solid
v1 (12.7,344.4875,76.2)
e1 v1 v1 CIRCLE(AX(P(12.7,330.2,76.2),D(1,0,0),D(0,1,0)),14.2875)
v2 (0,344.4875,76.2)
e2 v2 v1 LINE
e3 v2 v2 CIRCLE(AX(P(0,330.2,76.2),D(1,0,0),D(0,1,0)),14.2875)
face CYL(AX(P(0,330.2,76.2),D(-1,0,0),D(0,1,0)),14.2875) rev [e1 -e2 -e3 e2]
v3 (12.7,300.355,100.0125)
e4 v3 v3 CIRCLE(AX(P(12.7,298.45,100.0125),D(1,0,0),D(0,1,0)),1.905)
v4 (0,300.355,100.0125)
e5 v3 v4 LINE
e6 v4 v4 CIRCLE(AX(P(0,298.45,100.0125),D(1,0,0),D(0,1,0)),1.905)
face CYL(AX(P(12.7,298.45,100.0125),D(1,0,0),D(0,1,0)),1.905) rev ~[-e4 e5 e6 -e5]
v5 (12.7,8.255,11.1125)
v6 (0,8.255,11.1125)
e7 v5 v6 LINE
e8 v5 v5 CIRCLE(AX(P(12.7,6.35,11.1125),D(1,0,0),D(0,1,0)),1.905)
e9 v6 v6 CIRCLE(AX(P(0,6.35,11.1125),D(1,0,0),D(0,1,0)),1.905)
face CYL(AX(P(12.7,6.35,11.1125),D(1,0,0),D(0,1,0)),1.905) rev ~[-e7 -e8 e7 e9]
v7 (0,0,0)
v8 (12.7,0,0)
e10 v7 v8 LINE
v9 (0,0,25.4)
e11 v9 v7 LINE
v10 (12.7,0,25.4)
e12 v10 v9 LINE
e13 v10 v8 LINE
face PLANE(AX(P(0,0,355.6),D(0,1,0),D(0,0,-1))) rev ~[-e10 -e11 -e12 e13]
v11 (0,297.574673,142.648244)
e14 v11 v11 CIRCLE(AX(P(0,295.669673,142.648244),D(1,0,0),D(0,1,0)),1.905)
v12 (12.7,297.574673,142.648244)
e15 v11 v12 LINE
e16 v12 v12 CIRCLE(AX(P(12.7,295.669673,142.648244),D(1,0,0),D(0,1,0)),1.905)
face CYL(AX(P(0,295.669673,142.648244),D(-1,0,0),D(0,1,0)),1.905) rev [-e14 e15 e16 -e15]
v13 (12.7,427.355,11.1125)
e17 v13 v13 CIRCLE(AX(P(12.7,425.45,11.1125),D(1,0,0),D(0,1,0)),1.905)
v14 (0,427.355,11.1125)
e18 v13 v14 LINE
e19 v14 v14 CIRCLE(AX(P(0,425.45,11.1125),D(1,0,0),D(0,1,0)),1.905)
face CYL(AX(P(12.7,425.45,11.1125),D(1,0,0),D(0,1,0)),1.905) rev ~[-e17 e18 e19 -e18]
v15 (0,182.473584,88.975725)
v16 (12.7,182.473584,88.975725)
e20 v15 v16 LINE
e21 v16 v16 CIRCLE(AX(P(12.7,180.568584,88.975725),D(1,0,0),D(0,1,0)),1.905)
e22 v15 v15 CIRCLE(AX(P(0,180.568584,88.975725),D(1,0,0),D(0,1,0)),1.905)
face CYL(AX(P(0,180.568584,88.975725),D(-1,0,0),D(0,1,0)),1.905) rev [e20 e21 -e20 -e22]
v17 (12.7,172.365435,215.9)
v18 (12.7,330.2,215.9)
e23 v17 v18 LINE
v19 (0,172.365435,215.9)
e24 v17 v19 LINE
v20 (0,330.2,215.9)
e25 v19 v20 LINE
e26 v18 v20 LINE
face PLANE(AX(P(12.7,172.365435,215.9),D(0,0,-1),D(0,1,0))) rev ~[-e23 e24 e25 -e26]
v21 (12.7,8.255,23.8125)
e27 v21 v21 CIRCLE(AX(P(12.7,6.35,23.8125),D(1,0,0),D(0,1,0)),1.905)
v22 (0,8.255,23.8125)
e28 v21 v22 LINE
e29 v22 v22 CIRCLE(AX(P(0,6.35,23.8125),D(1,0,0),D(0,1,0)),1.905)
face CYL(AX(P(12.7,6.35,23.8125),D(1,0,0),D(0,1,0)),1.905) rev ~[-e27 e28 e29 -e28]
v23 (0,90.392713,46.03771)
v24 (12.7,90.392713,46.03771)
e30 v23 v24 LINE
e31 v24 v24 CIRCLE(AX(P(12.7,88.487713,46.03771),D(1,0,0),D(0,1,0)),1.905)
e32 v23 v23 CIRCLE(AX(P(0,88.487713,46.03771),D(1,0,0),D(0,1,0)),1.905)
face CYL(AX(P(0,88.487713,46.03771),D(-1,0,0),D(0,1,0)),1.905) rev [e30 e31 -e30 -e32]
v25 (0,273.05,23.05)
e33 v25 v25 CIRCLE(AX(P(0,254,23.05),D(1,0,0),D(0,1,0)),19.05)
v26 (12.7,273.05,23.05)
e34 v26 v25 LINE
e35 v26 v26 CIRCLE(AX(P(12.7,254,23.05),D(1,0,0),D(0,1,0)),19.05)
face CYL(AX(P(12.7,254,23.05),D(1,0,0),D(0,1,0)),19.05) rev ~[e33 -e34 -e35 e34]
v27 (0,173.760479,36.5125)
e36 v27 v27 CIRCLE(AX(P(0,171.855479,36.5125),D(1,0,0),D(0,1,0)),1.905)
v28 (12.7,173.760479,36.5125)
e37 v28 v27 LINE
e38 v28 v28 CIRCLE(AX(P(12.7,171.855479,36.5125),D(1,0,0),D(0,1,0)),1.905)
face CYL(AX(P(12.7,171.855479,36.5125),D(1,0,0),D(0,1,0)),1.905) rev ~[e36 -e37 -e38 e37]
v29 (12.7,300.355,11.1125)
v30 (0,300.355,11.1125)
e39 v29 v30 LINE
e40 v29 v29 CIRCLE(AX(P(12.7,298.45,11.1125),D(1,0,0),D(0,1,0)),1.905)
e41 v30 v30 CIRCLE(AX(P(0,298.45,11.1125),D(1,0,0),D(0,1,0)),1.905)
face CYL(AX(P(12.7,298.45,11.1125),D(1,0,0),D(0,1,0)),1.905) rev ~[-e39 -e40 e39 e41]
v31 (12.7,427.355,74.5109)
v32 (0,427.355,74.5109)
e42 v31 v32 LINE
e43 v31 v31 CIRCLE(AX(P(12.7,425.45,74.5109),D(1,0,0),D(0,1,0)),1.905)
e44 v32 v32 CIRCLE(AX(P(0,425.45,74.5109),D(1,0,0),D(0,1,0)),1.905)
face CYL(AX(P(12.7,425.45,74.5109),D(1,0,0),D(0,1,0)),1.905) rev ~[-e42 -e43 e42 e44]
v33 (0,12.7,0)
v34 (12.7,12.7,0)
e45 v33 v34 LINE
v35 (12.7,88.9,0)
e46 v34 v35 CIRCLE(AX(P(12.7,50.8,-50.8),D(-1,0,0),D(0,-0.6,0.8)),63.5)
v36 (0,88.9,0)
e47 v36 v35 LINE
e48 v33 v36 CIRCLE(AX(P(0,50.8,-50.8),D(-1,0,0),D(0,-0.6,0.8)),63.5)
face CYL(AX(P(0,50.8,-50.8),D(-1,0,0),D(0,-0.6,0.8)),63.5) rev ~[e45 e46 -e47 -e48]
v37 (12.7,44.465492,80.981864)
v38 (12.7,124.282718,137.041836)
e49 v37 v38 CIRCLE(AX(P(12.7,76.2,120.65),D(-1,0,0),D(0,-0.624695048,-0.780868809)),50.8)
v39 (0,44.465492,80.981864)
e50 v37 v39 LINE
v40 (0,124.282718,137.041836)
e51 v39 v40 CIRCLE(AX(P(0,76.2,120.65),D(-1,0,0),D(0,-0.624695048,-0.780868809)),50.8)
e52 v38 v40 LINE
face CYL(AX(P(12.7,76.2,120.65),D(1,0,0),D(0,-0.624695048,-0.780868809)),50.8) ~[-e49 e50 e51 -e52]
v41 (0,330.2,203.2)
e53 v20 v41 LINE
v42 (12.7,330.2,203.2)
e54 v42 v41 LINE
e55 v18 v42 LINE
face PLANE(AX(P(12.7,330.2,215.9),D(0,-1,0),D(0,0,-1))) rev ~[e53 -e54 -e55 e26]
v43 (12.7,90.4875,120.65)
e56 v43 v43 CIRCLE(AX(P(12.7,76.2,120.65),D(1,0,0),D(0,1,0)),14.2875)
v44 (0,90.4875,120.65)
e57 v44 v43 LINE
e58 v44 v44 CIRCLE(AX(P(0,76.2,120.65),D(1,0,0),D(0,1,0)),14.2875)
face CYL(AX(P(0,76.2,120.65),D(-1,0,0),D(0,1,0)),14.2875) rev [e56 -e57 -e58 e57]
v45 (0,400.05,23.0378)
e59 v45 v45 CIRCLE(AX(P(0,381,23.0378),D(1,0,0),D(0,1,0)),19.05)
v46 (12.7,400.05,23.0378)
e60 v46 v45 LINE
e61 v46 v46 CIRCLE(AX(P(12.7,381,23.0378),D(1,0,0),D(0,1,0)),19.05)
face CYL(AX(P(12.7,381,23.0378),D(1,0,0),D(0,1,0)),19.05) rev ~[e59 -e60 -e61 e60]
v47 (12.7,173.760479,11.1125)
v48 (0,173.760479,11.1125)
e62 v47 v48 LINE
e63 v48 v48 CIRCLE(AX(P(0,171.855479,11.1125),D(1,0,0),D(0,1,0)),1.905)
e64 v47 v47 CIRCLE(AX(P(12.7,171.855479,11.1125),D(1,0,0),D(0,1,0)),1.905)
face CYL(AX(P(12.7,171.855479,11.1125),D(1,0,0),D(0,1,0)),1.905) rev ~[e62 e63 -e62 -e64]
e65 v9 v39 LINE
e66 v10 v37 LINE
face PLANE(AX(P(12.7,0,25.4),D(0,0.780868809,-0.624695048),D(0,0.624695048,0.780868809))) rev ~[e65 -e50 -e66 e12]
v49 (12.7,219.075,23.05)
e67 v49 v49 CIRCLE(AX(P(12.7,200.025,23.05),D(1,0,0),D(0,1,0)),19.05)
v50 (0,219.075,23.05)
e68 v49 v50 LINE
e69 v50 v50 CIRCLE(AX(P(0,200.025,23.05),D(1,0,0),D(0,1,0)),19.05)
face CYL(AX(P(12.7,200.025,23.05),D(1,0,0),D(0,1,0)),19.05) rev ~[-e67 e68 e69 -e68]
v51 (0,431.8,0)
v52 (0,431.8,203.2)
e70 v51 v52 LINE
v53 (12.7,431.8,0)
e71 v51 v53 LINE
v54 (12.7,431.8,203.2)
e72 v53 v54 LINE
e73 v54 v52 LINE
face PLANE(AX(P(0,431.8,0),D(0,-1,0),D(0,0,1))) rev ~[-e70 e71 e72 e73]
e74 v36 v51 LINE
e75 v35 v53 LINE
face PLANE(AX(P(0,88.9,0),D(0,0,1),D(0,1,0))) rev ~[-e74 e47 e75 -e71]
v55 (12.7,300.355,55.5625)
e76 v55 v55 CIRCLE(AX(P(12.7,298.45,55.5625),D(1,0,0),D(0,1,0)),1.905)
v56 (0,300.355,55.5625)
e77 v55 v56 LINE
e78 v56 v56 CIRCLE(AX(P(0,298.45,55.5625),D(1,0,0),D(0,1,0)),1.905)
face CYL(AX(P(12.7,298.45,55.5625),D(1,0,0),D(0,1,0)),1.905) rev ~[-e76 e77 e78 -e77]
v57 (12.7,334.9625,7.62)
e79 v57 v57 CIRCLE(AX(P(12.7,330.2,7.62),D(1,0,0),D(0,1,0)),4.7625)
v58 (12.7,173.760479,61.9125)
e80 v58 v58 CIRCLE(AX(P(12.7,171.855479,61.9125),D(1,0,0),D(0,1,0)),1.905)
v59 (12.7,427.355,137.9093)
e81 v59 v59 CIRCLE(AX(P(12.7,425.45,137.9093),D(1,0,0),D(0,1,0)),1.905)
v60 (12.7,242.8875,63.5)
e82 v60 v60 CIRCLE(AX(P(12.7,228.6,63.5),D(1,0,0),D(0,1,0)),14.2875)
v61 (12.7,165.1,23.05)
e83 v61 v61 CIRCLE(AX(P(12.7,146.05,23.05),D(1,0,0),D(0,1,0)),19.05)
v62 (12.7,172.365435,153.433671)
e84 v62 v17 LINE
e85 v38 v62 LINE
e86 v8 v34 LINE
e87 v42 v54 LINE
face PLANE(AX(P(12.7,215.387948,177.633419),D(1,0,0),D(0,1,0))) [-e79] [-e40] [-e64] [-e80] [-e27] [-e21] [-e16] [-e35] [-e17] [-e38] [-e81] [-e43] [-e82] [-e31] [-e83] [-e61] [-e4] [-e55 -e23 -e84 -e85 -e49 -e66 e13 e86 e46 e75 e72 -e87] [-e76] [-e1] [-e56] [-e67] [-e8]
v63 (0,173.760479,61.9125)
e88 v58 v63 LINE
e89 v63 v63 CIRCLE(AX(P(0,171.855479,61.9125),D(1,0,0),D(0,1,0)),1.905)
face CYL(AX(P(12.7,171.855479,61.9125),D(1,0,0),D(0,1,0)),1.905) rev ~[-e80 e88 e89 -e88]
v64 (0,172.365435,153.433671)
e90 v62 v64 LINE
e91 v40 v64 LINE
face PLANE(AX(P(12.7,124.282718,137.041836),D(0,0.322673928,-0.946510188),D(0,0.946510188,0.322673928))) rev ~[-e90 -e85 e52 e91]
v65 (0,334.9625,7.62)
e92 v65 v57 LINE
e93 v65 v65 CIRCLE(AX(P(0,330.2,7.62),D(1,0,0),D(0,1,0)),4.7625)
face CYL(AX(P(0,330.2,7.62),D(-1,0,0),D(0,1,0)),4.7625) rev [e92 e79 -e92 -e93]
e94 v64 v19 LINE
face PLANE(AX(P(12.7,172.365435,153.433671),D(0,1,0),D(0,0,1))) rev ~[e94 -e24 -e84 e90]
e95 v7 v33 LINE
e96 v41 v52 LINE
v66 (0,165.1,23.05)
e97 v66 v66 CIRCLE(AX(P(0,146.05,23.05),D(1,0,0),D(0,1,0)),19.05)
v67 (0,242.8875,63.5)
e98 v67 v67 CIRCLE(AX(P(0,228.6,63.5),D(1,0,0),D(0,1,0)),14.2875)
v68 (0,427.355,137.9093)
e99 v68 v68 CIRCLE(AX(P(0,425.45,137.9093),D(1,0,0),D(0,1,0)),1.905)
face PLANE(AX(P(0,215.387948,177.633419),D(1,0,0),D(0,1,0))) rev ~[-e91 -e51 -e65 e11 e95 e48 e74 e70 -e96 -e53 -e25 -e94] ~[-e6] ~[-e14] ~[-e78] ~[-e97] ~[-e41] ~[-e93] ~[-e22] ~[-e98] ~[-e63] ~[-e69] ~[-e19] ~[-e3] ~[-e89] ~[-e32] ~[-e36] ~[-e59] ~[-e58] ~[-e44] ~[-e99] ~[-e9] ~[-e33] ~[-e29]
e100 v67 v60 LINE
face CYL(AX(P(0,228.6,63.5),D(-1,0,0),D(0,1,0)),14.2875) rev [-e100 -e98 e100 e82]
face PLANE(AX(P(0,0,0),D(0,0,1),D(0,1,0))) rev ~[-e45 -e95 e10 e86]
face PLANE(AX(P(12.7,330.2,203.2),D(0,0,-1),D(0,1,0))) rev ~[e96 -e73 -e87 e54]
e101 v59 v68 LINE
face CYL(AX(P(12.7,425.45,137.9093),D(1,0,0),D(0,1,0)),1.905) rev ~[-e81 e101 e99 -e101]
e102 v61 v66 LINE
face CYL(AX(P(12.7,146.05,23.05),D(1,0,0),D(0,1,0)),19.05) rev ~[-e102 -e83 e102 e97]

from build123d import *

# Parameters (mm, degrees)
F0_R     = 1.905
F0_R_2   = 14.2875
F0_R_3   = 4.7625
F1_DEPTH = 12.7
F2_R     = 19.05
F3_DEPTH = 12.7
F5_DEPTH = 12.7
F6_R     = 1.905
F7_DEPTH = 12.7


with BuildPart() as f1:
    # F0 (on Right) → F1 (new body)
    with BuildSketch(Plane.YZ):
        with BuildLine():
            Line((0, 355.6), (0, 0))
            Line((0, 0), (12.7, 0))
            ThreePointArc((12.7, 0), (50.8, 12.7), (88.9, 0))
            Line((88.9, 0), (431.8, 0))
            Line((431.8, 0), (431.8, 355.6))
            Line((431.8, 355.6), (0, 355.6))
        make_face()
        with Locations((88.4877131973, 46.0377095938)):
            Circle(F0_R, mode=Mode.SUBTRACT)
        with Locations((180.5685843602, 88.9757249866)):
            Circle(F0_R, mode=Mode.SUBTRACT)
        with Locations((228.6, 63.5)):
            Circle(F0_R_2, mode=Mode.SUBTRACT)
        with Locations((330.2, 7.62)):
            Circle(F0_R_3, mode=Mode.SUBTRACT)
        with Locations((330.2, 76.2)):
            Circle(F0_R_2, mode=Mode.SUBTRACT)
        with Locations((76.2, 120.65)):
            Circle(F0_R_2, mode=Mode.SUBTRACT)
        with Locations((295.6696733139, 142.6482442277)):
            Circle(F0_R, mode=Mode.SUBTRACT)
    extrude(amount=F1_DEPTH)

    # F2 (on face) → F3 (cut, through all)
    with BuildSketch(Plane.YZ.offset(12.7)):
        with Locations((146.05, 23.05)):
            Circle(F2_R)
        with Locations((254, 23.05)):
            Circle(F2_R)
        with Locations((381, 23.0378)):
            Circle(F2_R)
        with Locations((200.025, 23.05)):
            Circle(F2_R)
    extrude(amount=-F3_DEPTH, mode=Mode.SUBTRACT)

    # F4 (on face) → F5 (cut, through all)
    with BuildSketch(Plane.YZ.offset(12.7)):
        Polygon((431.8, 355.6), (0, 355.6), (0, 215.9), (172.3654351189, 215.9), (330.2, 215.9), (355.6, 215.9), (431.8, 215.9), align=None)
        with BuildLine():
            Line((172.3654351189, 215.9), (0, 215.9))
            Line((0, 215.9), (0, 25.4))
            Line((0, 25.4), (44.4654915842, 80.9818644803))
            ThreePointArc((44.4654915842, 80.9818644803), (47.0024645882, 162.2209505049), (124.2827175595, 137.0418355316))
            Line((124.2827175595, 137.0418355316), (172.3654351189, 153.4336710633))
            Line((172.3654351189, 153.4336710633), (172.3654351189, 215.9))
        make_face()
        Polygon((431.8, 203.2), (431.8, 215.9), (355.6, 215.9), (330.2, 207.2409090909), (330.2, 203.2), align=None)
        Polygon((330.2, 207.2409090909), (355.6, 215.9), (330.2, 215.9), align=None)
    extrude(amount=-F5_DEPTH, mode=Mode.SUBTRACT)

    # F6 (on face) → F7 (cut, through all)
    with BuildSketch(Plane.YZ.offset(12.7)):
        with Locations((425.45, 11.1125)):
            Circle(F6_R)
        with Locations((425.45, 74.5109)):
            Circle(F6_R)
        with Locations((425.45, 137.9093)):
            Circle(F6_R)
        with Locations((298.45, 11.1125)):
            Circle(F6_R)
        with Locations((298.45, 100.0125)):
            Circle(F6_R)
        with Locations((298.45, 55.5625)):
            Circle(F6_R)
        with Locations((171.8554794788, 11.1125)):
            Circle(F6_R)
        with Locations((171.8554794788, 36.5125)):
            Circle(F6_R)
        with Locations((171.8554794788, 61.9125)):
            Circle(F6_R)
        with Locations((6.35, 11.1125)):
            Circle(F6_R)
        with Locations((6.35, 23.8125)):
            Circle(F6_R)
    extrude(amount=-F7_DEPTH, mode=Mode.SUBTRACT)


solid = f1.part
